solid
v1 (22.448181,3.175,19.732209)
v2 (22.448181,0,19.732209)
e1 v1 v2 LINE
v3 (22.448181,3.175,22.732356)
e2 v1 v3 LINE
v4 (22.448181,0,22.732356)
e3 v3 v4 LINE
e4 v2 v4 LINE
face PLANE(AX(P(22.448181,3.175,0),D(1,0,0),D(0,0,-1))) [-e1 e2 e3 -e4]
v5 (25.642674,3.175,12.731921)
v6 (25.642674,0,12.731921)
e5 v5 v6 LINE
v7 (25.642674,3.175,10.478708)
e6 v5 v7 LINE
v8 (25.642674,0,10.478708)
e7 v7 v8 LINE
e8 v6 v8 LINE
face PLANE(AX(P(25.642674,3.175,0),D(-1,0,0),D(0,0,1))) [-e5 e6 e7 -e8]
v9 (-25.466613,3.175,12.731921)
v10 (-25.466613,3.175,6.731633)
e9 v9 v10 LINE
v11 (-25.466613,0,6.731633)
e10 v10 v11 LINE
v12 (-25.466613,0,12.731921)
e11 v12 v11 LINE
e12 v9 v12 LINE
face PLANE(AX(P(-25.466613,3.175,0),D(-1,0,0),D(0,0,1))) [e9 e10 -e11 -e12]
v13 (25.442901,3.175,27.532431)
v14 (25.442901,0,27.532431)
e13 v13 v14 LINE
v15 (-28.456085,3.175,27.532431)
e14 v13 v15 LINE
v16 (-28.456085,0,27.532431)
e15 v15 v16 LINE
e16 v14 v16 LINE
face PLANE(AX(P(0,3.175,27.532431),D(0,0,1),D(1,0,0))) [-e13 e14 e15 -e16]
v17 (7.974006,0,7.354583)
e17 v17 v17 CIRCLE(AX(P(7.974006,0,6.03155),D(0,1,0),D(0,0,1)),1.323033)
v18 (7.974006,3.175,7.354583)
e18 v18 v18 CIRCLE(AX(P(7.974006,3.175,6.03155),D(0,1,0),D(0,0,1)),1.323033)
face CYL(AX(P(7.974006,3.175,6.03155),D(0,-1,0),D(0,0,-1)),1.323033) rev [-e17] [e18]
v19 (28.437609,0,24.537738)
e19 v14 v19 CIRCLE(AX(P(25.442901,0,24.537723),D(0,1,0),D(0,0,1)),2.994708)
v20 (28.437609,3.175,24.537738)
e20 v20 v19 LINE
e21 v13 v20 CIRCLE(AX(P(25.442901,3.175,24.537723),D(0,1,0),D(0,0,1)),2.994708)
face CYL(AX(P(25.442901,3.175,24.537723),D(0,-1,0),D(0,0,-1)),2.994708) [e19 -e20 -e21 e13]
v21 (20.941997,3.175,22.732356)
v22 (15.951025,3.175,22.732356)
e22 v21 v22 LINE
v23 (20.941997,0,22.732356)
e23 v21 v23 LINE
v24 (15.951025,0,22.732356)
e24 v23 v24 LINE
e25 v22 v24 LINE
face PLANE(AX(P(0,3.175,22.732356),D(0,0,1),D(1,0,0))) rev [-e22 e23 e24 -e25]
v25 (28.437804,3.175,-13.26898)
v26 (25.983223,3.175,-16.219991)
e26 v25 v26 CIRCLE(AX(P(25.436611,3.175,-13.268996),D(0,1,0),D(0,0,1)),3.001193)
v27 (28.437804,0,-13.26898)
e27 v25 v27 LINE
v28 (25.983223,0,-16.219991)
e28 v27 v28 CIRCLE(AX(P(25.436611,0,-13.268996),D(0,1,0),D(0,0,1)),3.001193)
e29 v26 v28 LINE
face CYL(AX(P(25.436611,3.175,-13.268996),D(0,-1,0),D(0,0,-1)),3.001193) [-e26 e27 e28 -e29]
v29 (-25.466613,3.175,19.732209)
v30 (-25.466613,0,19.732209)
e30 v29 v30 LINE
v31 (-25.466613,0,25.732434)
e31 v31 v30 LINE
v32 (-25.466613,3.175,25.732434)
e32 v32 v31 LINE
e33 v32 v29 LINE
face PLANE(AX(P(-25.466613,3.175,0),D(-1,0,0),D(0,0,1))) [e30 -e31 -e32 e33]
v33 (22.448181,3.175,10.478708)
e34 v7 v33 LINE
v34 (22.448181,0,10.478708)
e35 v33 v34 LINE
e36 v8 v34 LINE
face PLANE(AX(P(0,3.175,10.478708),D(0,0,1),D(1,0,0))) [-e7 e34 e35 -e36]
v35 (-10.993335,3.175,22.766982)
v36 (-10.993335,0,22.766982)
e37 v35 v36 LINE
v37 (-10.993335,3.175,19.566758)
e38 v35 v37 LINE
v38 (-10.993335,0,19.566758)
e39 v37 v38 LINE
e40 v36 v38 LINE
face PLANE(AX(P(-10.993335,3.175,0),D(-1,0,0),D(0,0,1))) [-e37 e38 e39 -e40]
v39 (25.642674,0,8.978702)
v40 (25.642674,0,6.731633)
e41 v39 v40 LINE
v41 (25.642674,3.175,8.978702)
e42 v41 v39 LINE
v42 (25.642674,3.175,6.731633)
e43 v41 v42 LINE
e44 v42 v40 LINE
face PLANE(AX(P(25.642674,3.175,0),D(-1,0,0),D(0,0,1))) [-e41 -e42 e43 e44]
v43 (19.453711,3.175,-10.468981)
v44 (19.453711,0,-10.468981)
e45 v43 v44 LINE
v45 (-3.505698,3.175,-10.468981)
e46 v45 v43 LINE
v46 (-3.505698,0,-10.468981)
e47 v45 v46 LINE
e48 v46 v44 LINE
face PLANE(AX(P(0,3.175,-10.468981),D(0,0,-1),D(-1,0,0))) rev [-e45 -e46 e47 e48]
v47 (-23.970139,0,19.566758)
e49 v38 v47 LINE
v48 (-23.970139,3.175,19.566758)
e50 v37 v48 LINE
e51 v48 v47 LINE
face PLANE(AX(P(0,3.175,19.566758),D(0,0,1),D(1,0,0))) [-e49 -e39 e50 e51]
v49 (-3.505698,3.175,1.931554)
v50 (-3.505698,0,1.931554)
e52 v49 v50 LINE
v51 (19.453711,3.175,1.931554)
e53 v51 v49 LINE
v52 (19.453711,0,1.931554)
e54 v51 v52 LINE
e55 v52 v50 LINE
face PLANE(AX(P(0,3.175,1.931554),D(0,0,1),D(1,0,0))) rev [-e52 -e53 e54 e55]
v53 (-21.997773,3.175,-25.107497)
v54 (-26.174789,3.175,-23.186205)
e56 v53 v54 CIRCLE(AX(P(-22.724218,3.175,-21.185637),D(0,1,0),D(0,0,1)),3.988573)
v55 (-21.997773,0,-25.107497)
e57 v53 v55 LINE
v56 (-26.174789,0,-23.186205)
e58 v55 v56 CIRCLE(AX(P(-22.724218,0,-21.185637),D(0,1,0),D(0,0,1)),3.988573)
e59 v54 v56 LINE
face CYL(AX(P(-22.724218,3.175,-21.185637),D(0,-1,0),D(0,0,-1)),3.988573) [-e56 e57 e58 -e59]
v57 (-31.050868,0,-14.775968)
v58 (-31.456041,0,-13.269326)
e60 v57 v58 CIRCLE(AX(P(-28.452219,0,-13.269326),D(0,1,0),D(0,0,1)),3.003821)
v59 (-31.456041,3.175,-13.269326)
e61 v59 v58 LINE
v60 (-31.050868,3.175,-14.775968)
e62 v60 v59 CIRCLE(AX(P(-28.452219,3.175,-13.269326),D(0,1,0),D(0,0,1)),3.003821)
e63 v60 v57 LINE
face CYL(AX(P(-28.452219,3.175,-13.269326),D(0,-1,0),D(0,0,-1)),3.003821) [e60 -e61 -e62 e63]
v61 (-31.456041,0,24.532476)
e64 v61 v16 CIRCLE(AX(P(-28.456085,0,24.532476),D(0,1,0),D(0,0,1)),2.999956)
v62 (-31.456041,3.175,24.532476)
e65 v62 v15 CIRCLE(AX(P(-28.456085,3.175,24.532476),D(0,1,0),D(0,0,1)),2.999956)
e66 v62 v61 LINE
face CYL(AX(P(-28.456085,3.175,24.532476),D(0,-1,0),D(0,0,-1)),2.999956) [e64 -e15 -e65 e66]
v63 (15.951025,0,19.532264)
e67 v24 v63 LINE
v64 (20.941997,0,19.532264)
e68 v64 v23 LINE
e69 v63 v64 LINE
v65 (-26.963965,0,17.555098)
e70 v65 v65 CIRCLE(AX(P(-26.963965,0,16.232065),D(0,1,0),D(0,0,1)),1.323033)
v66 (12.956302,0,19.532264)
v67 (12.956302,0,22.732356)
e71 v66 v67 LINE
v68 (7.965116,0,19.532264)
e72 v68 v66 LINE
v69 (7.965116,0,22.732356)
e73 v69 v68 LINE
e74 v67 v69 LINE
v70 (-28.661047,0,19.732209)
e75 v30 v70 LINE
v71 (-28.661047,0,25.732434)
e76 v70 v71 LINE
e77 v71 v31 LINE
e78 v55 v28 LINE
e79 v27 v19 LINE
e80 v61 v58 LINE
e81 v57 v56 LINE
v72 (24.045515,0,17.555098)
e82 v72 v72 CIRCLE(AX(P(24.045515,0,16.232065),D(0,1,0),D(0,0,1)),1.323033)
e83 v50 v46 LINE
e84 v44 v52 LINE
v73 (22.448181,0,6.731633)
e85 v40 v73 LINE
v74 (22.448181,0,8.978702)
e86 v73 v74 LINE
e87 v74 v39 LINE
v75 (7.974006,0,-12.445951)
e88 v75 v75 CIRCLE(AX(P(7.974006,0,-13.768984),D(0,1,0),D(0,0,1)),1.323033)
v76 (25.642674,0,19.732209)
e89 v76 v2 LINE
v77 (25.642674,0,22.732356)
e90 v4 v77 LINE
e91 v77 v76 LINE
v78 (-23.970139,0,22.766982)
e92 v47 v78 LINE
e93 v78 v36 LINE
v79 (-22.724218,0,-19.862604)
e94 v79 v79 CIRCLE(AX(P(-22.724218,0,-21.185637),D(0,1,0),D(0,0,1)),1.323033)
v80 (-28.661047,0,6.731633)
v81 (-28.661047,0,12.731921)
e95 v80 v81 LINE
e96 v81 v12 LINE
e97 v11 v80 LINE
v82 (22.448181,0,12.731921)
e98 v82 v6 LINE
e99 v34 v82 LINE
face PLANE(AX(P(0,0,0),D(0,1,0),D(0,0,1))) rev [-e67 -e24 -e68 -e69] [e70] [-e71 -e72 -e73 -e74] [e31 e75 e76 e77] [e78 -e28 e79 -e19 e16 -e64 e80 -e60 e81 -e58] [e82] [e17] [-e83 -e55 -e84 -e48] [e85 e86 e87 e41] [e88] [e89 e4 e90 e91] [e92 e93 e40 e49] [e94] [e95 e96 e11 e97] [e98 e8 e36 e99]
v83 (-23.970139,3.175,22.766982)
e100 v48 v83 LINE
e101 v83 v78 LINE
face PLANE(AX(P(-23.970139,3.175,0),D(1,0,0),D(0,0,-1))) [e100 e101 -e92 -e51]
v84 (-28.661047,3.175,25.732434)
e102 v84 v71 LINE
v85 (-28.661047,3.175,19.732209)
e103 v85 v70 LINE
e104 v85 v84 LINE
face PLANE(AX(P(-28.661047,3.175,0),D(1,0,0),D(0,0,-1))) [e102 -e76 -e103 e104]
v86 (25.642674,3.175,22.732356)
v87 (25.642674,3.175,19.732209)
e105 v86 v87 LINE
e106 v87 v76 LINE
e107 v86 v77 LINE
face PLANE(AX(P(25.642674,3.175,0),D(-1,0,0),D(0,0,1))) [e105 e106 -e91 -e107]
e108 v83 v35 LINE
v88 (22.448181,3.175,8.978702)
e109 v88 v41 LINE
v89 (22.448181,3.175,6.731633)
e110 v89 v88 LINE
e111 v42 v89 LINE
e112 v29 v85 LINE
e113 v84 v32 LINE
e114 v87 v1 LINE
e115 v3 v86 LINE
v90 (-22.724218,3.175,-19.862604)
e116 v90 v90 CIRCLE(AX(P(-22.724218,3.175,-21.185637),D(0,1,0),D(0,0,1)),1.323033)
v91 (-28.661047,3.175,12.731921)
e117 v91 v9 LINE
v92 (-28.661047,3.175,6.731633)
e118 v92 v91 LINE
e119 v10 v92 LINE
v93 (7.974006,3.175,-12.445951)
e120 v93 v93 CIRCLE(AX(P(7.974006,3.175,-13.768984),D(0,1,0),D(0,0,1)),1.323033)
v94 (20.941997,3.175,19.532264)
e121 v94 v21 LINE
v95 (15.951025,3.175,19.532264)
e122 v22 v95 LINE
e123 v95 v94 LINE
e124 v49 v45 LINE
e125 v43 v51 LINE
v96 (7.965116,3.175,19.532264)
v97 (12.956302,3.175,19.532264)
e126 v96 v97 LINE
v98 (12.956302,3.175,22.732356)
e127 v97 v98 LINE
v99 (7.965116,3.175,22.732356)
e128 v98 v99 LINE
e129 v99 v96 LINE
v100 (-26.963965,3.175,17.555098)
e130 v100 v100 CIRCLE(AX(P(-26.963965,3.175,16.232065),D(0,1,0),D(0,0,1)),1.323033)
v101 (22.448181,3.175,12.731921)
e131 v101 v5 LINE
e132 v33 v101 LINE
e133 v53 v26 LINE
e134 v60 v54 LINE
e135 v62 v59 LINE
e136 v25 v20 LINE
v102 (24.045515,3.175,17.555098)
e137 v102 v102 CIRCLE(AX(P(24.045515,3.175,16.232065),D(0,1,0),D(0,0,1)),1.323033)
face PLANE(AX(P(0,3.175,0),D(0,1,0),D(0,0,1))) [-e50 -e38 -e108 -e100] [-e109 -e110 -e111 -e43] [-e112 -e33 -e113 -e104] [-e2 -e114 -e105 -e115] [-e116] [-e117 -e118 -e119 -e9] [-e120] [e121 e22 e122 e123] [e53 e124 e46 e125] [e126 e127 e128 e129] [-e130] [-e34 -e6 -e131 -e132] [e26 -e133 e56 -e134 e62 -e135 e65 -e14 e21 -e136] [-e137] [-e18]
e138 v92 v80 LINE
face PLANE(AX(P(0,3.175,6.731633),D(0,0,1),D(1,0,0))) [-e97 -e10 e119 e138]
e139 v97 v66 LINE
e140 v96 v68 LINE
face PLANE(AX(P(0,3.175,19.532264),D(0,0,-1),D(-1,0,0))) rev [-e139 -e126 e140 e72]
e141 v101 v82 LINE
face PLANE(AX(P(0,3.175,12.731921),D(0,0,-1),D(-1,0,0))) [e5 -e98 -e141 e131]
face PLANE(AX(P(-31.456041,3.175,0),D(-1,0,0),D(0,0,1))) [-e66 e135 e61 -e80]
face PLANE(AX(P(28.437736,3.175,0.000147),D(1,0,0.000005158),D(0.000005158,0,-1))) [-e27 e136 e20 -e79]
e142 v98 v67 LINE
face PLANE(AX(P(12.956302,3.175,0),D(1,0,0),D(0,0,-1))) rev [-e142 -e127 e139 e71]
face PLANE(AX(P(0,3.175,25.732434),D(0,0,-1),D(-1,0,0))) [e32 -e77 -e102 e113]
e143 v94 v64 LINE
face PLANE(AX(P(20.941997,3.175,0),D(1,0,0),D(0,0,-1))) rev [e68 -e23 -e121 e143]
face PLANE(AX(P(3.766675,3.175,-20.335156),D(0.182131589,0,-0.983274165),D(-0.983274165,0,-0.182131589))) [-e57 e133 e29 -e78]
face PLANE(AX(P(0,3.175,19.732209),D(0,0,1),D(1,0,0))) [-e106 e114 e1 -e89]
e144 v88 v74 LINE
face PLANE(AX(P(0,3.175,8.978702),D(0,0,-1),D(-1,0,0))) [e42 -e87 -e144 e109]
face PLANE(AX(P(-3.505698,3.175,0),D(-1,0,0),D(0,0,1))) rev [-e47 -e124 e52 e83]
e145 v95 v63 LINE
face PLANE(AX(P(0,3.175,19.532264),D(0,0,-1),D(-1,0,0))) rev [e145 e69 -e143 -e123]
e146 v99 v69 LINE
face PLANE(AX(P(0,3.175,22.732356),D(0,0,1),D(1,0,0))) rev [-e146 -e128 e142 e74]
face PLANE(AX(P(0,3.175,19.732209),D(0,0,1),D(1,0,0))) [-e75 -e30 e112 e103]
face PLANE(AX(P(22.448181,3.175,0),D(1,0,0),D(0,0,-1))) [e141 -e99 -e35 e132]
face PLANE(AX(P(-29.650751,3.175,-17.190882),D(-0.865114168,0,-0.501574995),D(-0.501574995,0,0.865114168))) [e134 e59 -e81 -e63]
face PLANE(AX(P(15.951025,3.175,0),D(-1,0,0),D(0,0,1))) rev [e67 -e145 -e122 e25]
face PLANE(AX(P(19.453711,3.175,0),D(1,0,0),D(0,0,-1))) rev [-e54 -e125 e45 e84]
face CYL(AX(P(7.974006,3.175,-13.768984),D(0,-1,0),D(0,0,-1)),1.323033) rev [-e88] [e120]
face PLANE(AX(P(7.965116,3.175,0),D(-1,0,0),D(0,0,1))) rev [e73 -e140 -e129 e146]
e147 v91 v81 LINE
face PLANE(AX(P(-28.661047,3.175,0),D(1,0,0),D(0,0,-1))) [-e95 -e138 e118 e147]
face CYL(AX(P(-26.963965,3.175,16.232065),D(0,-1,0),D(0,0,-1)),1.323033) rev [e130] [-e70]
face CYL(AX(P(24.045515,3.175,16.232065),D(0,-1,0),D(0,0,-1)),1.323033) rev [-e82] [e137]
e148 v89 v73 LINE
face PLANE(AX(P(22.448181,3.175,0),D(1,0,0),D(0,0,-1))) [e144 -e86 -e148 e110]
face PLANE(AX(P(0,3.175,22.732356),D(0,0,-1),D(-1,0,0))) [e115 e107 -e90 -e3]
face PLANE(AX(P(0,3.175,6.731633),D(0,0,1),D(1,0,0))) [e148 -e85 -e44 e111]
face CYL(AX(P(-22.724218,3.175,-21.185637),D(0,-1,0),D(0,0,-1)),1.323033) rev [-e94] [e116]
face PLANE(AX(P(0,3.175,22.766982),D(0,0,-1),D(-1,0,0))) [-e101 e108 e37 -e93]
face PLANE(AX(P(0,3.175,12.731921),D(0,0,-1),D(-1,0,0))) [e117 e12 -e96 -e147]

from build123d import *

# Parameters (mm, degrees)
SKETCH1_W           = 3.194434014
SKETCH1_H           = 6.000224533
SKETCH1_W_2         = 12.976803263
SKETCH1_H_2         = 3.200223762
SKETCH1_R           = 1.323033288
SKETCH1_H_3         = 6.000288014
SKETCH1_W_3         = 4.991186163
SKETCH1_H_4         = 3.200091917
SKETCH1_W_4         = 4.990971694
SKETCH1_W_5         = 3.194492506
SKETCH1_H_5         = 3.000146449
SKETCH1_H_6         = 2.247069465
SKETCH1_W_6         = 22.959409558
SKETCH1_H_7         = 12.40053533
BOSS_EXTRUDE1_DEPTH = 3.175


with BuildPart() as part:
    # Sketch1 → Boss-Extrude1 (new body)
    with BuildSketch(Plane(origin=(0, 0, 0), x_dir=(1, 0, 0), z_dir=(0, 1, 0))):
        with BuildLine():
            Line((-28.456084878, -27.532431428), (25.442900716, -27.532431428))
            ThreePointArc((25.442900716, -27.532431428), (27.560473935, -26.65530708), (28.437609204, -24.537738386))
            Line((28.437609204, -24.537738386), (28.437804204, 13.268980227))
            ThreePointArc((28.437804204, 13.268980227), (27.743957441, 15.188191581), (25.983223234, 16.219991273))
            Line((25.983223234, 16.219991273), (-21.997773241, 25.107497345))
            ThreePointArc((-21.997773241, 25.107497345), (-24.390968499, 24.809261571), (-26.174789125, 23.186205164))
            Line((-26.174789125, 23.186205164), (-31.050867612, 14.775968165))
            ThreePointArc((-31.050867612, 14.775968165), (-31.352979308, 14.049412081), (-31.456040564, 13.269326446))
            Line((-31.456040564, 13.269326446), (-31.456040564, -24.532475742))
            ThreePointArc((-31.456040564, -24.532475742), (-30.577373887, -26.653764751), (-28.456084878, -27.532431428))
        make_face()
        with Locations((-27.063830276, -22.732321631)):
            Rectangle(SKETCH1_W, SKETCH1_H, mode=Mode.SUBTRACT)
        with Locations((-17.481737065, -21.16687035)):
            Rectangle(SKETCH1_W_2, SKETCH1_H_2, mode=Mode.SUBTRACT)
        with Locations((-26.963965218, -16.232064957)):
            Circle(SKETCH1_R, mode=Mode.SUBTRACT)
        with Locations((-27.063830275, -9.731776544)):
            Rectangle(SKETCH1_W, SKETCH1_H_3, mode=Mode.SUBTRACT)
        with Locations((10.460708795, -21.132309856)):
            Rectangle(SKETCH1_W_3, SKETCH1_H_4, mode=Mode.SUBTRACT)
        with Locations((18.446511119, -21.132309856)):
            Rectangle(SKETCH1_W_4, SKETCH1_H_4, mode=Mode.SUBTRACT)
        with Locations((24.045427435, -21.232282591)):
            Rectangle(SKETCH1_W_5, SKETCH1_H_5, mode=Mode.SUBTRACT)
        with Locations((24.045515173, -16.23206496)):
            Circle(SKETCH1_R, mode=Mode.SUBTRACT)
        with Locations((7.974006472, -6.031549942)):
            Circle(SKETCH1_R, mode=Mode.SUBTRACT)
        Polygon((22.448181182, -10.484914569), (22.448181182, -10.478708085), (25.642673688, -10.478708085), (25.642673688, -12.731920553), (22.448181182, -12.731920553), align=None, mode=Mode.SUBTRACT)
        with Locations((24.045427436, -7.855167272)):
            Rectangle(SKETCH1_W_5, SKETCH1_H_6, mode=Mode.SUBTRACT)
        with Locations((-22.724218332, 21.185636807)):
            Circle(SKETCH1_R, mode=Mode.SUBTRACT)
        with Locations((7.974006472, 4.268713184)):
            Rectangle(SKETCH1_W_6, SKETCH1_H_7, mode=Mode.SUBTRACT)
        with Locations((7.974006473, 13.76898446)):
            Circle(SKETCH1_R, mode=Mode.SUBTRACT)
    extrude(amount=BOSS_EXTRUDE1_DEPTH)


solid = part.part
